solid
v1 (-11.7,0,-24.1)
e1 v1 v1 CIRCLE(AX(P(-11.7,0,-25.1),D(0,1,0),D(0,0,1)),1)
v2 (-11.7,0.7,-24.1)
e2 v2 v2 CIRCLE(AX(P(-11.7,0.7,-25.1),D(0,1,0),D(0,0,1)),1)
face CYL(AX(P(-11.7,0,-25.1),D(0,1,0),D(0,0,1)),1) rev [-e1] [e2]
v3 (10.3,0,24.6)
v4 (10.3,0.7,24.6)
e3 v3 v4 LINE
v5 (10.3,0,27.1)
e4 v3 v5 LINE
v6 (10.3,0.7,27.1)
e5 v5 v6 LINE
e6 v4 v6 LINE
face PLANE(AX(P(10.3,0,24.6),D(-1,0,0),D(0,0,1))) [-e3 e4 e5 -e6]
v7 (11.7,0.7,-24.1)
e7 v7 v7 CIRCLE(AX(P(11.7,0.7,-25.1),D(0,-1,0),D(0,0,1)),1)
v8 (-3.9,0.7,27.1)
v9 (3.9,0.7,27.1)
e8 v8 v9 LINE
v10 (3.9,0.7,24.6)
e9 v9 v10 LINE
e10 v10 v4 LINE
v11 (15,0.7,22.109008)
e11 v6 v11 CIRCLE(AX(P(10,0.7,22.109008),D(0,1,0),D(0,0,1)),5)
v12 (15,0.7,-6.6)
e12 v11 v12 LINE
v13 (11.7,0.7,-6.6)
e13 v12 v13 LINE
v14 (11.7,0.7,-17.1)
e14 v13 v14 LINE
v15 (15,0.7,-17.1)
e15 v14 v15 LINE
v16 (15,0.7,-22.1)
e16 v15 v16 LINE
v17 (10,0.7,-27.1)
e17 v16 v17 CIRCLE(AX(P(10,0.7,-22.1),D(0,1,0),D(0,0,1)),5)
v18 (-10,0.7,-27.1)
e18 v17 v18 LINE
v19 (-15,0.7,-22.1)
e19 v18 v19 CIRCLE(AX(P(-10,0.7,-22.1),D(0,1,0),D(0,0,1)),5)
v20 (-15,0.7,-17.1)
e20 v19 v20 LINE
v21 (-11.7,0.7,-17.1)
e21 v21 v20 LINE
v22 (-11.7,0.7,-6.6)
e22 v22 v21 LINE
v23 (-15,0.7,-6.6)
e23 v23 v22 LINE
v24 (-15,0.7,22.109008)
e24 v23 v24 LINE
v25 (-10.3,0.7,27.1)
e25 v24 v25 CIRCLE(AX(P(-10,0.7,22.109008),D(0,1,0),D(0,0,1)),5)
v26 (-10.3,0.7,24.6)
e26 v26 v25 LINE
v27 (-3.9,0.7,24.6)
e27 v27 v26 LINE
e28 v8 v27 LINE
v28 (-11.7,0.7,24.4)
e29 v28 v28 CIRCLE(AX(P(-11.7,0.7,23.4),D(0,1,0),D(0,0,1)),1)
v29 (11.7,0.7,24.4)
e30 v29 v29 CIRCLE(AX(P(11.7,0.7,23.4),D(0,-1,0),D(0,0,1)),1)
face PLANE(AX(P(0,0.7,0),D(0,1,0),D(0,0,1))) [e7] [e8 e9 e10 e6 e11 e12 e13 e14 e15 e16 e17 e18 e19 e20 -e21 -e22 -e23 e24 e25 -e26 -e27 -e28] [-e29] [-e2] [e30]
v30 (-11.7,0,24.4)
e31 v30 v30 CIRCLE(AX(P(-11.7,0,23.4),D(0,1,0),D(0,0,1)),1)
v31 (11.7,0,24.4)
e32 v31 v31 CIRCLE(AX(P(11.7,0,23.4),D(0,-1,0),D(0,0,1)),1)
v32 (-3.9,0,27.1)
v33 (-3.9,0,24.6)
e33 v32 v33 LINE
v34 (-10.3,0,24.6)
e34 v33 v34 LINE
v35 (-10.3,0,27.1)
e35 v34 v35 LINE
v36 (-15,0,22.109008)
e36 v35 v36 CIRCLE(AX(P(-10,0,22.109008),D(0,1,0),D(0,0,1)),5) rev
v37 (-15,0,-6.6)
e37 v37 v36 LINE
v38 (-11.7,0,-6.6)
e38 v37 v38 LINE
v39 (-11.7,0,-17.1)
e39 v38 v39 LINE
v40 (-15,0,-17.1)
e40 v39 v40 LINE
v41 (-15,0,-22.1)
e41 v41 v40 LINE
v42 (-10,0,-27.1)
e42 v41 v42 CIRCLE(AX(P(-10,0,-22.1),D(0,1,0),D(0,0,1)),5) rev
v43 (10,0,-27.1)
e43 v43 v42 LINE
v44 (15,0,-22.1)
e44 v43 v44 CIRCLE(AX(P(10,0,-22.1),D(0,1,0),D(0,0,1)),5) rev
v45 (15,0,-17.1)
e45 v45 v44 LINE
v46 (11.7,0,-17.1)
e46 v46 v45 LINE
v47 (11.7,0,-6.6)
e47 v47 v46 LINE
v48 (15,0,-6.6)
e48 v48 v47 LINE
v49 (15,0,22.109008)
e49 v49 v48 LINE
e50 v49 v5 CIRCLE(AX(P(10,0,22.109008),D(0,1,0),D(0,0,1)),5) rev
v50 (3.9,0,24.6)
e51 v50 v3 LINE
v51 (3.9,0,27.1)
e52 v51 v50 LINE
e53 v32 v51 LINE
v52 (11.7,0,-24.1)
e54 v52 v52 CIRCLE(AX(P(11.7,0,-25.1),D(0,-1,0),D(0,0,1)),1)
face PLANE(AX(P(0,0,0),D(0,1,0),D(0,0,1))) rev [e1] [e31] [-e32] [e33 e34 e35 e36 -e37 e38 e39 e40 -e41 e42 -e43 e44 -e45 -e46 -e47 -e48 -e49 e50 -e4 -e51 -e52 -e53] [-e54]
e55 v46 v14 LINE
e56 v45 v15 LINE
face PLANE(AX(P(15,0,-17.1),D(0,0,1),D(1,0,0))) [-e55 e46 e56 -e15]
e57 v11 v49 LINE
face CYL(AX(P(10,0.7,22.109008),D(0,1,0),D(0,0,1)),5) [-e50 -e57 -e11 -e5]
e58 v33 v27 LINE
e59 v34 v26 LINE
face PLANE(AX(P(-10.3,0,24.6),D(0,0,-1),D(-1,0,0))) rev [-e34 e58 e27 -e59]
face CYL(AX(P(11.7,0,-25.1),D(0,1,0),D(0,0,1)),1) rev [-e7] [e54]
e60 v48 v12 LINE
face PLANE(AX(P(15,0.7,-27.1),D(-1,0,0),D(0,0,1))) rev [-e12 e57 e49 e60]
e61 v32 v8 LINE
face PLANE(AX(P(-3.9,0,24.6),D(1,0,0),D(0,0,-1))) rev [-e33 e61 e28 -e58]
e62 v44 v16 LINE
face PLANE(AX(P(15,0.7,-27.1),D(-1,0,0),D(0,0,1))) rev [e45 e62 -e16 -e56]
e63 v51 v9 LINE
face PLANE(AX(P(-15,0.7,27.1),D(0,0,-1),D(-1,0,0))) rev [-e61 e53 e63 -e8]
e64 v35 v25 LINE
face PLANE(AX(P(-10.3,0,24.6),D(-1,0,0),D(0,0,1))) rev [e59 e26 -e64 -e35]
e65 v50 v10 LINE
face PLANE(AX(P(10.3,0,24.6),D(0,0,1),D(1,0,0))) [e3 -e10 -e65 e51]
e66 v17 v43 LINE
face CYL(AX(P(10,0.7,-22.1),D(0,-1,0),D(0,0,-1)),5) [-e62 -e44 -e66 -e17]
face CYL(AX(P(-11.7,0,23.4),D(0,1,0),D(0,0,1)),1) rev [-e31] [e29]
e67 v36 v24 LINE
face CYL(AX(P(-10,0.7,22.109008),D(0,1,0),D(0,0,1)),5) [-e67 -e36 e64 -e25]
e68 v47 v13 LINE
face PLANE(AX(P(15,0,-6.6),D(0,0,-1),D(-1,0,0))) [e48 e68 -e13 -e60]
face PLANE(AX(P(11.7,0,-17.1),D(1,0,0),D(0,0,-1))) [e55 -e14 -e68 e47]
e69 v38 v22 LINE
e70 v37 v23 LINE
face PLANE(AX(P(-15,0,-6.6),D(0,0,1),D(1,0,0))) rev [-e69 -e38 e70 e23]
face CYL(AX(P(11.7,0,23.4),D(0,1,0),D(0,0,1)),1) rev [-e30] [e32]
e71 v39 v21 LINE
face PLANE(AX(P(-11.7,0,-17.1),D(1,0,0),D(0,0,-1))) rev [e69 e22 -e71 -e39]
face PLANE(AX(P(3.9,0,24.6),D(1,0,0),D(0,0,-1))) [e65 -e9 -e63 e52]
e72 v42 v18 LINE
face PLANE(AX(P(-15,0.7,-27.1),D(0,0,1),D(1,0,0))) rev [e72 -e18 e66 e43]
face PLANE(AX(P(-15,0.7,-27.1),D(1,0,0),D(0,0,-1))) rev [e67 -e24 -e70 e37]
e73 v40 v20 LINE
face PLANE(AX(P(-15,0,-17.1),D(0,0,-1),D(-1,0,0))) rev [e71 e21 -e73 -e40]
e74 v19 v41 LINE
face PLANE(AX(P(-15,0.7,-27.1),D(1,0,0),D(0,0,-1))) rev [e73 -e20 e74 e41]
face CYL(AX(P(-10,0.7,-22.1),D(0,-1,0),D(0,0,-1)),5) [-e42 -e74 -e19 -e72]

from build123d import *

# Parameters (mm, degrees)
SKETCH2_W          = 30
SKETCH2_H          = 54.2
CIRCUITBOARD_DEPTH = 0.7
SKETCH3_W          = 3.3
SKETCH3_H          = 10.5
SKETCH3_W_2        = 6.4
SKETCH3_H_2        = 2.5
CUT_EXTRUDE1_DEPTH = 31.982252985
FILLET2_R          = 5
SKETCH4_R          = 1
SCREWHOLES_DEPTH   = 31.982252985


with BuildPart() as part:
    # Sketch2 → CircuitBoard (new body)
    with BuildSketch(Plane(origin=(0, 0, 0), x_dir=(1, 0, 0), z_dir=(0, 1, 0))):
        Rectangle(SKETCH2_W, SKETCH2_H)
    extrude(amount=CIRCUITBOARD_DEPTH)

    # Sketch3 → Cut-Extrude1 (cut, through all)
    with BuildSketch(Plane(origin=(0, 0.7, 0), x_dir=(1, 0, 0), z_dir=(0, 1, 0))):
        with Locations((-13.35, 11.85)):
            Rectangle(SKETCH3_W, SKETCH3_H)
        with Locations((-7.1, -25.85)):
            Rectangle(SKETCH3_W_2, SKETCH3_H_2)
    cut_extrude1 = extrude(amount=-CUT_EXTRUDE1_DEPTH, mode=Mode.SUBTRACT)

    # Cut_Mirror: Cut-Extrude1 across plane
    add(cut_extrude1.mirror(Plane(origin=(0, 0, 0), x_dir=(0, 0, 1), z_dir=(1, 0, 0))), mode=Mode.SUBTRACT)

    # Cut_Mirror at the second plane: Cut-Extrude1 across plane
    add(cut_extrude1.mirror(Plane.ZX), mode=Mode.SUBTRACT)

    # Fillet2
    # the kernel refuses this fillet: 5 mm, written as the material it takes off along each edge
    with BuildSketch(Plane(origin=(-15, -12.477479713, 27.1), x_dir=(0, 0, -1), z_dir=(0, 1, 0))) as fillet2_piece_1:
        with BuildLine():
            CenterArc((4.990991885, -5), FILLET2_R, 90, 86.560187232)
            Line((0, -4.7), (-0.099819838, -4.694))
            ThreePointArc((-0.099819838, -4.694), (-0.1, -2.35), (-0.1, 0))
            Line((-0.1, 0), (0, 0.1))
            Line((0, 0.1), (4.990991885, 0.1))
            Line((4.990991885, 0.1), (4.990991885, 0))
        make_face()
    extrude(amount=25.654959427, mode=Mode.SUBTRACT)
    with BuildSketch(Plane(origin=(15, -12.477479713, 27.1), x_dir=(-1, 0, 0), z_dir=(0, 1, 0))) as fillet2_piece_2:
        with BuildLine():
            CenterArc((5, -4.990991885), FILLET2_R, 93.439812768, 86.560187232)
            Line((0, -4.990991885), (-0.1, -4.990991885))
            Line((-0.1, -4.990991885), (-0.1, 0))
            Line((-0.1, 0), (0, 0.1))
            ThreePointArc((0, 0.1), (2.35, 0.1), (4.694, 0.099819838))
            Line((4.694, 0.099819838), (4.7, 0))
        make_face()
    extrude(amount=25.654959427, mode=Mode.SUBTRACT)
    with BuildSketch(Plane(origin=(15, -12.5, -27.1), x_dir=(-1, 0, 0), z_dir=(0, 1, 0))) as fillet2_piece_3:
        with BuildLine():
            CenterArc((FILLET2_R, FILLET2_R), FILLET2_R, 180, 90)
            Line((0, FILLET2_R), (-FILLET2_R * 0.02, FILLET2_R))
            Line((-FILLET2_R * 0.02, FILLET2_R), (-FILLET2_R * 0.02, -FILLET2_R * 0.02))
            Line((-FILLET2_R * 0.02, -FILLET2_R * 0.02), (FILLET2_R, -FILLET2_R * 0.02))
            Line((FILLET2_R, -FILLET2_R * 0.02), (FILLET2_R, 0))
        make_face()
    extrude(amount=25.7, mode=Mode.SUBTRACT)
    with BuildSketch(Plane(origin=(-15, -12.5, -27.1), x_dir=(1, 0, 0), z_dir=(0, 1, 0))) as fillet2_piece_4:
        with BuildLine():
            CenterArc((FILLET2_R, -FILLET2_R), FILLET2_R, 90, 90)
            Line((0, -FILLET2_R), (-FILLET2_R * 0.02, -FILLET2_R))
            Line((-FILLET2_R * 0.02, -FILLET2_R), (-FILLET2_R * 0.02, FILLET2_R * 0.02))
            Line((-FILLET2_R * 0.02, FILLET2_R * 0.02), (FILLET2_R, FILLET2_R * 0.02))
            Line((FILLET2_R, FILLET2_R * 0.02), (FILLET2_R, 0))
        make_face()
    extrude(amount=25.7, mode=Mode.SUBTRACT)

    # Sketch4 → ScrewHoles (cut, through all)
    with BuildSketch(Plane(origin=(0, 0.7, 0), x_dir=(1, 0, 0), z_dir=(0, 1, 0))):
        with Locations(Location((-11.7, 25.1, 0), (0, 0, 270))):
            Circle(SKETCH4_R)
        with Locations(Location((-11.7, -23.4, 0), (0, 0, 270))):
            Circle(SKETCH4_R)
    screwholes = extrude(amount=-SCREWHOLES_DEPTH, mode=Mode.SUBTRACT)

    # ScrewHoles_Mirror: ScrewHoles across plane
    add(screwholes.mirror(Plane(origin=(0, 0, 0), x_dir=(0, 0, 1), z_dir=(1, 0, 0))), mode=Mode.SUBTRACT)

    # ScrewHoles_Mirror at the second plane: ScrewHoles across plane
    add(screwholes.mirror(Plane.ZX), mode=Mode.SUBTRACT)


solid = part.part
